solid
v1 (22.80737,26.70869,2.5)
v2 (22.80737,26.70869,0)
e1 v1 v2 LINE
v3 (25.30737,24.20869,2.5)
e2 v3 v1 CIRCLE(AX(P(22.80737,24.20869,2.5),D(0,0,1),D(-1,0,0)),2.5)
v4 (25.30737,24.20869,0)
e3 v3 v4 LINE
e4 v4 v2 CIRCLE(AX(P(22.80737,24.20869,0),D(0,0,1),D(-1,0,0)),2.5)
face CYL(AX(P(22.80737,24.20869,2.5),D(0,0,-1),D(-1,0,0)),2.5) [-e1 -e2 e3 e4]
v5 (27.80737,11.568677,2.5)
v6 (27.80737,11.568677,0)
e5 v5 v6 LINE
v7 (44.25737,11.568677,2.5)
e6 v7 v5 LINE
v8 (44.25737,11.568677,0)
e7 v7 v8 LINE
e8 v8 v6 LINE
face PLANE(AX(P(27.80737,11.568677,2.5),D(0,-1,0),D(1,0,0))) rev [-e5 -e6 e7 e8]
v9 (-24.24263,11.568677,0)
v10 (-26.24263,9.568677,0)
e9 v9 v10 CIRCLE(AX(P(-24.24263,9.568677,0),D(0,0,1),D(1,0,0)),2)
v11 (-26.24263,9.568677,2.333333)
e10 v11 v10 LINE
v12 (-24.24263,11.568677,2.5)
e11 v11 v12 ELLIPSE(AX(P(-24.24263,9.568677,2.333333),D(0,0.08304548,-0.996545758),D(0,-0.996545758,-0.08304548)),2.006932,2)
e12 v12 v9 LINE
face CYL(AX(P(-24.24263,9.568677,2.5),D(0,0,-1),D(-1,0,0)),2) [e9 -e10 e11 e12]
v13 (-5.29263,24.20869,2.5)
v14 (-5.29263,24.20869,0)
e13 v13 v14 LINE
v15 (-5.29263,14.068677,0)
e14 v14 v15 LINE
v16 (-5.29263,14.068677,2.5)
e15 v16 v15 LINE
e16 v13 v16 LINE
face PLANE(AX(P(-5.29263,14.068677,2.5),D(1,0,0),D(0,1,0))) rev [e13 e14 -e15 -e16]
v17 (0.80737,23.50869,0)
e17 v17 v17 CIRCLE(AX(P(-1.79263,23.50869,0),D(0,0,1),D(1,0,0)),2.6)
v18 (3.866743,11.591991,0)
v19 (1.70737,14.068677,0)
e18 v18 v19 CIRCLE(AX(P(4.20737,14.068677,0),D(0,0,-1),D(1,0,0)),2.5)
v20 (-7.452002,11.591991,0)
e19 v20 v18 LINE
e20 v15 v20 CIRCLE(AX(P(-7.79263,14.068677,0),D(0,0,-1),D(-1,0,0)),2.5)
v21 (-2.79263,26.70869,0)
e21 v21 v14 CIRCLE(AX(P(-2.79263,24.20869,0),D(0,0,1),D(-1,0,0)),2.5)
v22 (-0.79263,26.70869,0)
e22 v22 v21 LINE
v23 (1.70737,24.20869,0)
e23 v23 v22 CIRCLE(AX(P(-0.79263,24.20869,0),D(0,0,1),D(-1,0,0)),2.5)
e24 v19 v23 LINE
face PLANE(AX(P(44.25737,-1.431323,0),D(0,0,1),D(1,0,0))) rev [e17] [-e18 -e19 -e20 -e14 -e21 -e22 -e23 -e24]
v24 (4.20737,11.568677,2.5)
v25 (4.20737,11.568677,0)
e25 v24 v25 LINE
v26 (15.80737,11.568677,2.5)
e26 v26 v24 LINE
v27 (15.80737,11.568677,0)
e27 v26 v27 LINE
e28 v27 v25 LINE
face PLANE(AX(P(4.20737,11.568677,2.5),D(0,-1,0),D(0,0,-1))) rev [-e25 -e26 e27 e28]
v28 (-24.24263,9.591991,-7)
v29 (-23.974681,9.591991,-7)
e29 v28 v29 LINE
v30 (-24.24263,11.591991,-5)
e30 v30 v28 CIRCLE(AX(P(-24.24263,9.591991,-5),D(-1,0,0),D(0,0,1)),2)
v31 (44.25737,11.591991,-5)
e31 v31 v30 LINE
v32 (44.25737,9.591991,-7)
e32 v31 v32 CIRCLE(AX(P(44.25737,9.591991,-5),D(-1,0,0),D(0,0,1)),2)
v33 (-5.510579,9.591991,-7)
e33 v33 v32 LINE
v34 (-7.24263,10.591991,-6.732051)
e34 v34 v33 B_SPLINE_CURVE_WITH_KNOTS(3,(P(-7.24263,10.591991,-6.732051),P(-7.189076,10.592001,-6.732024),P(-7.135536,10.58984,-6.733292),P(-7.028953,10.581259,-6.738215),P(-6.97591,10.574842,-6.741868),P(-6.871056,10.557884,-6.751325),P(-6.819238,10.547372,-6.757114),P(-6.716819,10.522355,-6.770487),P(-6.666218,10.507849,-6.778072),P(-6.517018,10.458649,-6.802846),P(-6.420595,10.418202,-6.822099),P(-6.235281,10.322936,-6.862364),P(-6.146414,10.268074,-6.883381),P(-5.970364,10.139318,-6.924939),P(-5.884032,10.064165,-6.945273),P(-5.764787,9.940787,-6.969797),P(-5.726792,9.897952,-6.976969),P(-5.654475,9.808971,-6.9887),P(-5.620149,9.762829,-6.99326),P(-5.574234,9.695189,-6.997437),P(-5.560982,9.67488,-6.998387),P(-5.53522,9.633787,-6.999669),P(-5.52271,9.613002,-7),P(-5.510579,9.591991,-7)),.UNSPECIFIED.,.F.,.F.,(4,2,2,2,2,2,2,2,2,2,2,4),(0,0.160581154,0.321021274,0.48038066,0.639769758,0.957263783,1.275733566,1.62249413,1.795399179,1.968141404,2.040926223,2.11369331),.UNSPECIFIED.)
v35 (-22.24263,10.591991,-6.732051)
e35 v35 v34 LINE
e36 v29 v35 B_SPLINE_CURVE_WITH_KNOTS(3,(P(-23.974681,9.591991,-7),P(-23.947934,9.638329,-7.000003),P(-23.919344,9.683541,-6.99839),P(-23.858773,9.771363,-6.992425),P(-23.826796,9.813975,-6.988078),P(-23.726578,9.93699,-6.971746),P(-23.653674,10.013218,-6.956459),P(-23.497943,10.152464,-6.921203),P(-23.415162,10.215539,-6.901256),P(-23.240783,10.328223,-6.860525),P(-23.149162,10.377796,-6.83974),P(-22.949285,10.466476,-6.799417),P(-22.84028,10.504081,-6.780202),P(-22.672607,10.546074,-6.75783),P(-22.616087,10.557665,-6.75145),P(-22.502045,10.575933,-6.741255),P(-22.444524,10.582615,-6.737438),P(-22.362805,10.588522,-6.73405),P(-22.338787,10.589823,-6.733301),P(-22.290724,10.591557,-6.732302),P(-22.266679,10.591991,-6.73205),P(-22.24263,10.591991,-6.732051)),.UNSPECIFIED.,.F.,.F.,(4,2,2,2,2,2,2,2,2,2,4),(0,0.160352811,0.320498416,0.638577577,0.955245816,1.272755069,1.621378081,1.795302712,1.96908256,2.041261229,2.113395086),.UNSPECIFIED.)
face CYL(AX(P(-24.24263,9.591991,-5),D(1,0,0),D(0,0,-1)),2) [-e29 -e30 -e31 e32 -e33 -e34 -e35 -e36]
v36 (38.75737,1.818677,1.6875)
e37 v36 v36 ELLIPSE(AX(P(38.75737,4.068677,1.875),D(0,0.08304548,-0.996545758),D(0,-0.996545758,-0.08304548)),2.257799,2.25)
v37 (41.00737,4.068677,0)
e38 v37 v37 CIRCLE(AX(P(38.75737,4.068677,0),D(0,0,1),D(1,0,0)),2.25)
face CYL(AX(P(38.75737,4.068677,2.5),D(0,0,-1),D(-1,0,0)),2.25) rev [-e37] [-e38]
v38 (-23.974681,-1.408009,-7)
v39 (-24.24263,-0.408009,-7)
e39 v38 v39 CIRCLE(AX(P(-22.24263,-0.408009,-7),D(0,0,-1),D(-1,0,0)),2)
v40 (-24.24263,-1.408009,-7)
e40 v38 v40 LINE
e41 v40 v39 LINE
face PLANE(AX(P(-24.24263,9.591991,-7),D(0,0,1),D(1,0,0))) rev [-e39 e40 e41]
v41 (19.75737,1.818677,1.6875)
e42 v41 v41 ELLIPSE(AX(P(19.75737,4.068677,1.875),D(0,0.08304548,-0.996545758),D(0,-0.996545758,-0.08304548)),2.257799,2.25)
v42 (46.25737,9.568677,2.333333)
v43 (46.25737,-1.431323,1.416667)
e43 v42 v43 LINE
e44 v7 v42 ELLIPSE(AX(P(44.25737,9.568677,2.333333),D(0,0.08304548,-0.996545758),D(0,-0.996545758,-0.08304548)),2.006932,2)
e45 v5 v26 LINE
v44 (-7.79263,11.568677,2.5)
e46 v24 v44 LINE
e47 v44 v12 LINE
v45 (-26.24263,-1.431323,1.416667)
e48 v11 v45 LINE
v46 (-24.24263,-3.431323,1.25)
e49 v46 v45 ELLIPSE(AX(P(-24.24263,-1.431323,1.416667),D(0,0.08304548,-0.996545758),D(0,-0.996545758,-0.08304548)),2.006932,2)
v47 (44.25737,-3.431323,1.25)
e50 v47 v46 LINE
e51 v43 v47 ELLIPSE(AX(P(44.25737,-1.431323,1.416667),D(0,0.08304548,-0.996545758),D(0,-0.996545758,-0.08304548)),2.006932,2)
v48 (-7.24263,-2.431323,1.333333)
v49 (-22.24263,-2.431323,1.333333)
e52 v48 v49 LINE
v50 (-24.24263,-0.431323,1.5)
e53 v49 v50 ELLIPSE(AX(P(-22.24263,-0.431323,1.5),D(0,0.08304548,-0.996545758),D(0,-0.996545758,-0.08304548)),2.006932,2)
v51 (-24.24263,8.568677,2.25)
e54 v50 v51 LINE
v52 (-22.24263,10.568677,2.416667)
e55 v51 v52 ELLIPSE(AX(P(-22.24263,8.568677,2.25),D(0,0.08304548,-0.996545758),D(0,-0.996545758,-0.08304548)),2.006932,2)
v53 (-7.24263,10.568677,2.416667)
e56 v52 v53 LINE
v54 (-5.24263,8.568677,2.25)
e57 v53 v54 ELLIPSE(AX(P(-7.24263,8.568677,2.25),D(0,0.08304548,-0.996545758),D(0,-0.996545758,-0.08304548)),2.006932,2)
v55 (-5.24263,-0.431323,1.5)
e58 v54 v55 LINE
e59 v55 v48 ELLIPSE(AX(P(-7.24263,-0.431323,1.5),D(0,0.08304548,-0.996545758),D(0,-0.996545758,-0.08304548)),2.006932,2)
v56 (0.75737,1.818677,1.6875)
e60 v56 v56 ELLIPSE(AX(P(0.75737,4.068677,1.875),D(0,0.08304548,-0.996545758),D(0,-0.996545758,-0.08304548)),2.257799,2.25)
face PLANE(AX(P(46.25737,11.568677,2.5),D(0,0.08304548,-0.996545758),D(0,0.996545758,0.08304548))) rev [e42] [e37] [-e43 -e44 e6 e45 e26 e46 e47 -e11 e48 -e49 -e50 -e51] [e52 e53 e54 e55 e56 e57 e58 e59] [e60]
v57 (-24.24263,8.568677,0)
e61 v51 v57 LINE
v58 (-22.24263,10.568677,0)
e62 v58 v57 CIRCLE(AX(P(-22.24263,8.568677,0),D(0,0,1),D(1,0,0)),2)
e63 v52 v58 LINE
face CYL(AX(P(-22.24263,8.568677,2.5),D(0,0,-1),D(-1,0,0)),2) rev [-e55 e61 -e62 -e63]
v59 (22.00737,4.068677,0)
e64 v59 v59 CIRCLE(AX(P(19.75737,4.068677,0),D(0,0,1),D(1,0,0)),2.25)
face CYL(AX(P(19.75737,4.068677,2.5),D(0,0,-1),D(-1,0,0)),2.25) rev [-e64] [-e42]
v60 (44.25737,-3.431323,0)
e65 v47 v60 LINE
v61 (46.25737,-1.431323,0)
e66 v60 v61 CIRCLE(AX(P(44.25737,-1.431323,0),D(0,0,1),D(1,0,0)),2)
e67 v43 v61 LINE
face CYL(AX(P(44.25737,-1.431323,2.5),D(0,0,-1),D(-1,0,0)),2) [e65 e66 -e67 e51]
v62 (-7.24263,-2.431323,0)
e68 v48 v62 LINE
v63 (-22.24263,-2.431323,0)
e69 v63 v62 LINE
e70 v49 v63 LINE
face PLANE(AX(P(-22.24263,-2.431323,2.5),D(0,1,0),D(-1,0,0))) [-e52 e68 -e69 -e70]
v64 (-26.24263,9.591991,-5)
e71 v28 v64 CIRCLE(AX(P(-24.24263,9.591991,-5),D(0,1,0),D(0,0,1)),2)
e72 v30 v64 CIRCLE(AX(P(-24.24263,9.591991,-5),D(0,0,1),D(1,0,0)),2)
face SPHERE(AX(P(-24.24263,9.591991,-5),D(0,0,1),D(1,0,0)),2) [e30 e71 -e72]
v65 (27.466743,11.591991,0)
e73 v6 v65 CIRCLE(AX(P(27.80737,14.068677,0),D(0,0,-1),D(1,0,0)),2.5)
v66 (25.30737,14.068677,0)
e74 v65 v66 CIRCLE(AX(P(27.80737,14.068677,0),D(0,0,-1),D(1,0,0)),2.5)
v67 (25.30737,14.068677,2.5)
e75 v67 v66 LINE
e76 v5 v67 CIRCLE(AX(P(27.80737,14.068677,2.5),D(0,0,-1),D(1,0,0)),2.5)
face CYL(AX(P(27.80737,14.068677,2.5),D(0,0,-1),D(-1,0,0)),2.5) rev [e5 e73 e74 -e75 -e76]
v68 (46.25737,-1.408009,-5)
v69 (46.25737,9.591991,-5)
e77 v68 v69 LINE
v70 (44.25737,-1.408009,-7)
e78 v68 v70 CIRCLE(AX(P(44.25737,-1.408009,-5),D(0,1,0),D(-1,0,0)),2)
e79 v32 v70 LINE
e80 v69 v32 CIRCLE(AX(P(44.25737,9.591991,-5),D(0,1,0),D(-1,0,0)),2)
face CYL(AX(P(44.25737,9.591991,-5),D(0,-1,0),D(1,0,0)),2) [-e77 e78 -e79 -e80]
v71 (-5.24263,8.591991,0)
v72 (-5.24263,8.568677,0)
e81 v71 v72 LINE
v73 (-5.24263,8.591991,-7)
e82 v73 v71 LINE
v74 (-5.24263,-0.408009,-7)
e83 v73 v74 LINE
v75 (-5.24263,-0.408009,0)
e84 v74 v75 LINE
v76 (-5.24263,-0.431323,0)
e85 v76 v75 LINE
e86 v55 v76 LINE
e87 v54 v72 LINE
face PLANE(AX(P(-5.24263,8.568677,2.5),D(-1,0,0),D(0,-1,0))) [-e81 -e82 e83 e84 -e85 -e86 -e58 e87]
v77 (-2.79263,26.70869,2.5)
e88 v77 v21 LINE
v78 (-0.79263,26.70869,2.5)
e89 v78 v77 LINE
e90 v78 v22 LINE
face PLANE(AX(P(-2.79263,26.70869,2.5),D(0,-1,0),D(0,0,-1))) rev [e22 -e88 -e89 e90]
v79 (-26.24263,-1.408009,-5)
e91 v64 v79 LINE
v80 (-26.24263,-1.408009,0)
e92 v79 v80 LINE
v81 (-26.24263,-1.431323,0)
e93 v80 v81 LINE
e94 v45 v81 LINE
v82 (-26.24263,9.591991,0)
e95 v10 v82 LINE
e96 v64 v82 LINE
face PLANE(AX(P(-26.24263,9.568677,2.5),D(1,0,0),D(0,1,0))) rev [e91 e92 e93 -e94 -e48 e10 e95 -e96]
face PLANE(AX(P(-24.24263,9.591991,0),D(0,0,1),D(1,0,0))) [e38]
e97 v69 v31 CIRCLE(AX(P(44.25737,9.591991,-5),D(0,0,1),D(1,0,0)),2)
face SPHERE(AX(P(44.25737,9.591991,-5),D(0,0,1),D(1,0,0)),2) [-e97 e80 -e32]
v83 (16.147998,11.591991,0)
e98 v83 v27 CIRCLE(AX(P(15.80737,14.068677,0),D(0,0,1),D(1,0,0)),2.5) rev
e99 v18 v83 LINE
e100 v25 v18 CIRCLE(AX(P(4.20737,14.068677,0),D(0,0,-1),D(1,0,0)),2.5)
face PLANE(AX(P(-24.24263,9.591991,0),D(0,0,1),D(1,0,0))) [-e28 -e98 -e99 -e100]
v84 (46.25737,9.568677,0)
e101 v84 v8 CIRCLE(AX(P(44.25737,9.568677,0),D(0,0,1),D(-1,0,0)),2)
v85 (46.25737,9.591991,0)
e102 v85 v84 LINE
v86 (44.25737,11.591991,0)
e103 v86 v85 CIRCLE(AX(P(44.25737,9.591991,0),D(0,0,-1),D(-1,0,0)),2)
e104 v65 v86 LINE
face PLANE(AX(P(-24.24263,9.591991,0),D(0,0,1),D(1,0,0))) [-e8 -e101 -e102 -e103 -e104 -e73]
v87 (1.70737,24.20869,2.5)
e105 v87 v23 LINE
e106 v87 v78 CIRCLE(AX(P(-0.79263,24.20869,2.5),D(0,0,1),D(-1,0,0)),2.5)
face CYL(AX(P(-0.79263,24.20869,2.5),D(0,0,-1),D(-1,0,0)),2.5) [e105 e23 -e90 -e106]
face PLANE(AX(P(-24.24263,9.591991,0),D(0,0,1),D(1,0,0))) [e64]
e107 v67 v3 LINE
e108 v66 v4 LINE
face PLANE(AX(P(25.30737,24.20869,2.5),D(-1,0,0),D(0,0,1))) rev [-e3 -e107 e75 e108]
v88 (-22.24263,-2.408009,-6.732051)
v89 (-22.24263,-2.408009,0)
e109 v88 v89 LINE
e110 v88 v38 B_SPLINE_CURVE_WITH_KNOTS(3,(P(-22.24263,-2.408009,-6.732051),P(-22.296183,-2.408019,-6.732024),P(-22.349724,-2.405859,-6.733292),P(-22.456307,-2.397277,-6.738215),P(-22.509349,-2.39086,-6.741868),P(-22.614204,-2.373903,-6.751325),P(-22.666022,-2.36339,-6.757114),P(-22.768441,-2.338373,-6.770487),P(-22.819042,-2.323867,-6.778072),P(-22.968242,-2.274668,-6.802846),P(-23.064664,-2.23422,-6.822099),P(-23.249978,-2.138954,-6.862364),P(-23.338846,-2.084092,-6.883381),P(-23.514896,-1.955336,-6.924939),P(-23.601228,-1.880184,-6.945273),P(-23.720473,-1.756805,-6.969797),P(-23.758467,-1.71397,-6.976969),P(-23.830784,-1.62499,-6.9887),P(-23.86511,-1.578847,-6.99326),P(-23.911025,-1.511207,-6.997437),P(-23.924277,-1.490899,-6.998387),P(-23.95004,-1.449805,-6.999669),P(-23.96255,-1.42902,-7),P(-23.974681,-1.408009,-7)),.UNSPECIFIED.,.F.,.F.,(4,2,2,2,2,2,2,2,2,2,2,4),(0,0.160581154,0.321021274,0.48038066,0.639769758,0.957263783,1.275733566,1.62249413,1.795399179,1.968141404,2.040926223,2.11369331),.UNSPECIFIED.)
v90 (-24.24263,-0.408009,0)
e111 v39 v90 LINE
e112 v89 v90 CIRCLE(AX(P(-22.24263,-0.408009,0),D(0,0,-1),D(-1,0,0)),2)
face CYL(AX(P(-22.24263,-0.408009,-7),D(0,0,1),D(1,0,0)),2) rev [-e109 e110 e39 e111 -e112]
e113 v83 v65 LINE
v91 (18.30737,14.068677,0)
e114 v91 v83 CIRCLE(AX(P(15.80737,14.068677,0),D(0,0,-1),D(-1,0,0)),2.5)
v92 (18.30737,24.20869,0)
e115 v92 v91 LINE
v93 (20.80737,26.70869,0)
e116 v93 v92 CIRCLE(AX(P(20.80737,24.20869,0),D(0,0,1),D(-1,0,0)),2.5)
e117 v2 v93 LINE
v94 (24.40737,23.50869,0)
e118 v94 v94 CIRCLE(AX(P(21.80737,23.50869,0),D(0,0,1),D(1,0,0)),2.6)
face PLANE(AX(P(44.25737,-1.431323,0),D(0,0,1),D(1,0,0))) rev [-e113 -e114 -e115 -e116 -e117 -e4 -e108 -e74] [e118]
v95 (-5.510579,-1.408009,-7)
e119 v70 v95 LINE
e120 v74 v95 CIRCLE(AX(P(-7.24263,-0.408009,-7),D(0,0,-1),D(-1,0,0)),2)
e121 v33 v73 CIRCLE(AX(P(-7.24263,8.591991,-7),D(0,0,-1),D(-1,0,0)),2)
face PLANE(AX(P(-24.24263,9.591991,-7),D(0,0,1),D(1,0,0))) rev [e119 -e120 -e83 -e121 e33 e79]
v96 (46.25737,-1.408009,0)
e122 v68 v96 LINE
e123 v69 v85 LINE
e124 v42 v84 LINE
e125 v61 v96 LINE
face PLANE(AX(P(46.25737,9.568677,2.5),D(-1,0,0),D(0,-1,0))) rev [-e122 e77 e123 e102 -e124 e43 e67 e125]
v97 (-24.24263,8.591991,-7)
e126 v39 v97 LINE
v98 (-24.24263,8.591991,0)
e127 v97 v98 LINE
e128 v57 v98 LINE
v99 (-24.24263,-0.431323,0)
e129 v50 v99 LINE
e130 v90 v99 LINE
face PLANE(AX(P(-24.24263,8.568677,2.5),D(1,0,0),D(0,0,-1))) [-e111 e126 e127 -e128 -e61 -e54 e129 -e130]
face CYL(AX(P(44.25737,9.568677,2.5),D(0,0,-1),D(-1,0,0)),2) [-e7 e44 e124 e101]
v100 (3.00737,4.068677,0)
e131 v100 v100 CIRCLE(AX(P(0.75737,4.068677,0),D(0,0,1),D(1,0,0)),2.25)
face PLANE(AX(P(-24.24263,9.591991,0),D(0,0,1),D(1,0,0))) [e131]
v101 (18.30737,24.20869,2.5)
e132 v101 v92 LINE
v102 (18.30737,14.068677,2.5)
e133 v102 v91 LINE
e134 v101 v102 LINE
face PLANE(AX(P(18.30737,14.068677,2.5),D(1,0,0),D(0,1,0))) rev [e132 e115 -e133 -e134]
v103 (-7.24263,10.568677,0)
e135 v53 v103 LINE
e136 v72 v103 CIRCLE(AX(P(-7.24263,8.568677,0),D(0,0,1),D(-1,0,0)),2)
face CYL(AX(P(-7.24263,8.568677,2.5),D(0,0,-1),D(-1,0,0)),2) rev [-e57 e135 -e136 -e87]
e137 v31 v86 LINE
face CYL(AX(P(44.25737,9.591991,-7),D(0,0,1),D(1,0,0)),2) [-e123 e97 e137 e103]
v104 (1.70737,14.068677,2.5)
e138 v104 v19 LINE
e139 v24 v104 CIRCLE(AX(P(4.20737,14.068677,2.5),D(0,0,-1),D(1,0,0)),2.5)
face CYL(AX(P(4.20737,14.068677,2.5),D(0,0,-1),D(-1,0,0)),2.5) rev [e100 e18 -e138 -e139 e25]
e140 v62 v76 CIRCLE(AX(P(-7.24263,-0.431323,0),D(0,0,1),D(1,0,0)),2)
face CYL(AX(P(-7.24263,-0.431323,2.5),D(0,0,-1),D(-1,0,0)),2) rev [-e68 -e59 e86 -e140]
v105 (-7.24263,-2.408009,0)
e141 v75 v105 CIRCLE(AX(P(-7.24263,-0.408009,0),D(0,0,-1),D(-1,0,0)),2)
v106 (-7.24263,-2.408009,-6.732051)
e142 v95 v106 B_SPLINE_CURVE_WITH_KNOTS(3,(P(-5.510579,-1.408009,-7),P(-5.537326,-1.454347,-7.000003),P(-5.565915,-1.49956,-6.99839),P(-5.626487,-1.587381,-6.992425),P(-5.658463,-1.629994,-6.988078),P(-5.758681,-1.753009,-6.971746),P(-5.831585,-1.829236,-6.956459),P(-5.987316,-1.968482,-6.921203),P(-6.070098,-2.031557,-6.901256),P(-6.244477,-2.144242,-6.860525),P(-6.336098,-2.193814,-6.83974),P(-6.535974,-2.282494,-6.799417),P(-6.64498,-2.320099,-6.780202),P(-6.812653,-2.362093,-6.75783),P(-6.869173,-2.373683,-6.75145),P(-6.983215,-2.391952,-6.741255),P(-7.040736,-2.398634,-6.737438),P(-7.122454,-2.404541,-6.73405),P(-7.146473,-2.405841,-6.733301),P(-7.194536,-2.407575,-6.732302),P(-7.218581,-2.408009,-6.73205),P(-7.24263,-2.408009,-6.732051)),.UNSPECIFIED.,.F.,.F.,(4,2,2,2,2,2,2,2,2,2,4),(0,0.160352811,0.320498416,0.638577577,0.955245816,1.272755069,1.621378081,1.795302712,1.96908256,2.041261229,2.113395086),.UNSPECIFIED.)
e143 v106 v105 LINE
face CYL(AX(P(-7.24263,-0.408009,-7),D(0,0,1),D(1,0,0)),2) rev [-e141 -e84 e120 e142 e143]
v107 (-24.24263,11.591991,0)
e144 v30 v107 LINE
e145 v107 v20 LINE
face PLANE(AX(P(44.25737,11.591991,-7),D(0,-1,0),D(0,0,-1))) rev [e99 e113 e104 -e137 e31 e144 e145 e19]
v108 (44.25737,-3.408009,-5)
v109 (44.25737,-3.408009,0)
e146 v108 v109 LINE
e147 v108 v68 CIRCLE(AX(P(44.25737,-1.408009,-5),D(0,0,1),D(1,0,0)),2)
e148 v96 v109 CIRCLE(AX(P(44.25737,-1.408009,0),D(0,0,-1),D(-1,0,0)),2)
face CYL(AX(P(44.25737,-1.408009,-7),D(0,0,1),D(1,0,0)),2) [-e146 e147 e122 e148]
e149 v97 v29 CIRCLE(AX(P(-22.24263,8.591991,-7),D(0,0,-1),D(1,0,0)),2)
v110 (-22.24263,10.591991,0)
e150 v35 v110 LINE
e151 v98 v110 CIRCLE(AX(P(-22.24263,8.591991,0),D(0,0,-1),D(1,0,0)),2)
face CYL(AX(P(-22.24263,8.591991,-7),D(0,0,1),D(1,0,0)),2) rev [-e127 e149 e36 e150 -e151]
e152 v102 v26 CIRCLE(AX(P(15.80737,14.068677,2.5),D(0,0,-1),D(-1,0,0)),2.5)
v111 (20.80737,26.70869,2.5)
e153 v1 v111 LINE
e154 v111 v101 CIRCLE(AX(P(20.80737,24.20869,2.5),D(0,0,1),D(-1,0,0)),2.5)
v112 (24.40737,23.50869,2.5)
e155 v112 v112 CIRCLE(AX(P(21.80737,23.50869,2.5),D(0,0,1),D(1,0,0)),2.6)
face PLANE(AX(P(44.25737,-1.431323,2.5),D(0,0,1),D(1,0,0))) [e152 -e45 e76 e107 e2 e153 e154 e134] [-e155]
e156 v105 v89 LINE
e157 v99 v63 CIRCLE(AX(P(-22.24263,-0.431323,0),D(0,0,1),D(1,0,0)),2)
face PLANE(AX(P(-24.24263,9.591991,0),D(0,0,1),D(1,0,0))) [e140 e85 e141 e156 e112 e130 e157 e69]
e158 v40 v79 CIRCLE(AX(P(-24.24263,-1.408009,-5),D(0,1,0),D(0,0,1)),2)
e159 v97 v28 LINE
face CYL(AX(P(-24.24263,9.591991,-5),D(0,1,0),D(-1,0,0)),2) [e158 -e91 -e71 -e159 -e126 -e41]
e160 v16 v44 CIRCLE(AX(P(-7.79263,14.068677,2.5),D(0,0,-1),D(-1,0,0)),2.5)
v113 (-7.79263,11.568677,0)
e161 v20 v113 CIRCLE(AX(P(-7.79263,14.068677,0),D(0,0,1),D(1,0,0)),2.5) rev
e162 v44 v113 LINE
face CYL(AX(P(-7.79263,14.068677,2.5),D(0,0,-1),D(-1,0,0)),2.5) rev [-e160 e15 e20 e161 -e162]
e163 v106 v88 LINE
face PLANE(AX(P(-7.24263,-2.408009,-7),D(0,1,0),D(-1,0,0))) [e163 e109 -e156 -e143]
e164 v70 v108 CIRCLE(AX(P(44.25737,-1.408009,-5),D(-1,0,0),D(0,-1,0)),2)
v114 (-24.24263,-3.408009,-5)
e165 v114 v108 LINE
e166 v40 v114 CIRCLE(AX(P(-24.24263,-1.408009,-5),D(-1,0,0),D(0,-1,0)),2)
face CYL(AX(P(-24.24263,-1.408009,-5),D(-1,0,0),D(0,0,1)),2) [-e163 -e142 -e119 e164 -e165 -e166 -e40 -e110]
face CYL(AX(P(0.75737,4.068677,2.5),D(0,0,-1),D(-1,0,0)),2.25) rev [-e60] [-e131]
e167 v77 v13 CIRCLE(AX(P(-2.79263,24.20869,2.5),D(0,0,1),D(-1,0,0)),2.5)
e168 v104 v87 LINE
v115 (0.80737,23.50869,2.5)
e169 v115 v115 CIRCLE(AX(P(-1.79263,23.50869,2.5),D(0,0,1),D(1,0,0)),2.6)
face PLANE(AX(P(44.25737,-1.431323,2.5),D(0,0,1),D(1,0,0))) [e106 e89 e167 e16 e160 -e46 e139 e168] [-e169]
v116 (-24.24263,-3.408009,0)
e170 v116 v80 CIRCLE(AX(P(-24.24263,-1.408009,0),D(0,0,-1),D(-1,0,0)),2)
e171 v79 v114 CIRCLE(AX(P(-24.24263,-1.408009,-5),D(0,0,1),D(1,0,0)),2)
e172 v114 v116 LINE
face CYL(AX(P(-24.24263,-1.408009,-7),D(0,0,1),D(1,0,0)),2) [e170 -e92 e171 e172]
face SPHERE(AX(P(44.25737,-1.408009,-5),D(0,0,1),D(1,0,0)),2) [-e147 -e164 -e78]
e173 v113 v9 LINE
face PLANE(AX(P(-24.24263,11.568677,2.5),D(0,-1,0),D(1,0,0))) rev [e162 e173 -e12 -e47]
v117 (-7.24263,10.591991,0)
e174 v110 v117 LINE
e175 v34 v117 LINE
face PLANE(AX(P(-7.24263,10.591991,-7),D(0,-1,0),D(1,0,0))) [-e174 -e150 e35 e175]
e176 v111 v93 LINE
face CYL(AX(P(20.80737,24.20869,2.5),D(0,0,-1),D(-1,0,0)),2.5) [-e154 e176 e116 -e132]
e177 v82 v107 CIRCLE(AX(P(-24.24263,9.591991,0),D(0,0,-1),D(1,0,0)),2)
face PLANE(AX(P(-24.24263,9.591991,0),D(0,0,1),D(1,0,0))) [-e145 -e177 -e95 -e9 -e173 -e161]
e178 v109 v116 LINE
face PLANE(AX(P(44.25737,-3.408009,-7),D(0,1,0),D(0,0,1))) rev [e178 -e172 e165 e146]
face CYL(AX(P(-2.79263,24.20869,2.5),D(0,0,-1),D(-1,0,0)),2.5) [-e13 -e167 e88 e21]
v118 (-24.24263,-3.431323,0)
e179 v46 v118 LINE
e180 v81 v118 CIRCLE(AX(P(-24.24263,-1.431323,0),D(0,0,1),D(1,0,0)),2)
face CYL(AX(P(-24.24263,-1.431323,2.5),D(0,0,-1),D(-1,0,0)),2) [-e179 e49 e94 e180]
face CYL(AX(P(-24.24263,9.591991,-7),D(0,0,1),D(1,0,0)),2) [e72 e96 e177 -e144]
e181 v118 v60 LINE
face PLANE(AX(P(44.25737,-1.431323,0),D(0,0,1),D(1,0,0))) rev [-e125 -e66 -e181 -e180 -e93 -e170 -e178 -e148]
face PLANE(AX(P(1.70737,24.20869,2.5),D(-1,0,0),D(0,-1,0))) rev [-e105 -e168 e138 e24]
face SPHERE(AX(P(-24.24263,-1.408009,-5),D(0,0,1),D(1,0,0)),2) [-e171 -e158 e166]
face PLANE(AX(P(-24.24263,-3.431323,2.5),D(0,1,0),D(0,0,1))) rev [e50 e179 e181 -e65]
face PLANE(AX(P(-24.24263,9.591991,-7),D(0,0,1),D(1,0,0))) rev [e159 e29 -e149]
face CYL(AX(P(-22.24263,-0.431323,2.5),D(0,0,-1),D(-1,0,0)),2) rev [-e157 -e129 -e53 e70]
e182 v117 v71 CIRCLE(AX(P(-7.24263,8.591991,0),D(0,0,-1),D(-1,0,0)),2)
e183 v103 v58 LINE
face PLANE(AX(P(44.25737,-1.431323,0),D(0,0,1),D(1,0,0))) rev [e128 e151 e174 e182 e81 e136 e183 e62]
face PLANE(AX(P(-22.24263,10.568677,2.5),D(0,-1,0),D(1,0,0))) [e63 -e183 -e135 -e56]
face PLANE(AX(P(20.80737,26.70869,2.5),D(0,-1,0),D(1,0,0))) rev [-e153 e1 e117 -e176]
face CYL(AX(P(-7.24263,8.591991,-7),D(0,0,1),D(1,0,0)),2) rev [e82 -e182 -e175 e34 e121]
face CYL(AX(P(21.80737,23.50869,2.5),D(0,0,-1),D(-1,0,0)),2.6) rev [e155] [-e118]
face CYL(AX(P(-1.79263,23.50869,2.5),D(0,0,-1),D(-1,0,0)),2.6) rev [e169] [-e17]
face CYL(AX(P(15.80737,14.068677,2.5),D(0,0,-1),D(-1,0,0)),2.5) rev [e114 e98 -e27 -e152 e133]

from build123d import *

# Parameters (mm, degrees)
SKETCH1_R           = 2.250000000000002
SKETCH1_R_2         = 2.249999999999999
SKETCH1_R_3         = 2.6000000000000005
SKETCH1_R_4         = 2.600000000000003
BOSS_EXTRUDE1_DEPTH = 2.5
BOSS_EXTRUDE2_DEPTH = 7
CUT_EXTRUDE1_DEPTH  = 78.57966290553851
FILLET1_R           = 2


with BuildPart() as part:
    # Sketch1 → Boss-Extrude1 (new body)
    with BuildSketch(Plane.XY):
        with BuildLine():
            Line((-24.24262981574538, 11.568676716917917), (-7.792629815745428, 11.568676716917919))
            ThreePointArc((-7.792629815745428, 11.568676716917919), (-6.024862862779042, 12.30090976395155), (-5.292629815745411, 14.068676716917937))
            Line((-5.292629815745411, 14.068676716917937), (-5.2926298157454115, 24.208689532378564))
            ThreePointArc((-5.2926298157454115, 24.208689532378564), (-4.5603967687117795, 25.976456485344933), (-2.7926298157454106, 26.70868953237856))
            Line((-2.7926298157454106, 26.70868953237856), (-0.7926298157454105, 26.70868953237856))
            ThreePointArc((-0.7926298157454105, 26.70868953237856), (0.975137137220956, 25.97645648534493), (1.7073701842545899, 24.208689532378564))
            Line((1.7073701842545899, 24.208689532378564), (1.707370184254591, 14.068676716917937))
            ThreePointArc((1.707370184254591, 14.068676716917937), (2.439603231288222, 12.30090976395155), (4.207370184254609, 11.568676716917919))
            Line((4.207370184254609, 11.568676716917919), (15.807370184254571, 11.568676716917919))
            ThreePointArc((15.807370184254571, 11.568676716917919), (17.575137137220956, 12.300909763951552), (18.307370184254587, 14.068676716917935))
            Line((18.307370184254587, 14.068676716917935), (18.30737018425459, 24.208689532378564))
            ThreePointArc((18.30737018425459, 24.208689532378564), (19.039603231288222, 25.976456485344933), (20.80737018425459, 26.708689532378564))
            Line((20.80737018425459, 26.708689532378564), (22.80737018425459, 26.708689532378568))
            ThreePointArc((22.80737018425459, 26.708689532378568), (24.575137137220963, 25.976456485344936), (25.307370184254594, 24.208689532378564))
            Line((25.307370184254594, 24.208689532378564), (25.307370184254594, 14.068676716917937))
            ThreePointArc((25.307370184254594, 14.068676716917937), (26.039603231288226, 12.300909763951552), (27.80737018425461, 11.568676716917919))
            Line((27.80737018425461, 11.568676716917919), (44.25737018425458, 11.568676716917917))
            ThreePointArc((44.25737018425458, 11.568676716917917), (45.67158374662769, 10.982890279291011), (46.2573701842546, 9.568676716917901))
            Line((46.2573701842546, 9.568676716917901), (46.25737018425459, -1.4313232830820677))
            ThreePointArc((46.25737018425459, -1.4313232830820677), (45.67158374662768, -2.845536845455177), (44.257370184254576, -3.431323283082082))
            Line((44.257370184254576, -3.431323283082082), (-24.242629815745374, -3.431323283082082))
            ThreePointArc((-24.242629815745374, -3.431323283082082), (-25.656843378118484, -2.8455368454551784), (-26.242629815745392, -1.4313232830820677))
            Line((-26.242629815745392, -1.4313232830820677), (-26.2426298157454, 9.568676716917903))
            ThreePointArc((-26.2426298157454, 9.568676716917903), (-25.65684337811849, 10.982890279291013), (-24.24262981574538, 11.568676716917917))
        make_face()
        with Locations((38.7573701842546, 4.068676716917918)):
            Circle(SKETCH1_R, mode=Mode.SUBTRACT)
        with Locations((19.757370184254597, 4.068676716917918)):
            Circle(SKETCH1_R_2, mode=Mode.SUBTRACT)
        with Locations((0.7573701842545979, 4.068676716917918)):
            Circle(SKETCH1_R_2, mode=Mode.SUBTRACT)
        with Locations((-1.7926298157454108, 23.50868953237856)):
            Circle(SKETCH1_R_3, mode=Mode.SUBTRACT)
        with Locations((21.80737018425459, 23.508689532378565)):
            Circle(SKETCH1_R_4, mode=Mode.SUBTRACT)
        with BuildLine():
            Line((-22.24262981574538, 10.568676716917917), (-7.242629815745397, 10.56867671691792))
            ThreePointArc((-7.242629815745397, 10.56867671691792), (-5.8284162533723025, 9.982890279291016), (-5.2426298157453965, 8.56867671691792))
            Line((-5.2426298157453965, 8.56867671691792), (-5.242629815745396, -0.43132328308208134))
            ThreePointArc((-5.242629815745396, -0.43132328308208134), (-5.828416253372301, -1.8455368454551766), (-7.242629815745396, -2.4313232830820817))
            Line((-7.242629815745396, -2.4313232830820817), (-22.24262981574538, -2.431323283082082))
            ThreePointArc((-22.24262981574538, -2.431323283082082), (-23.65684337811849, -1.8455368454551762), (-24.242629815745396, -0.43132328308206774))
            Line((-24.242629815745396, -0.43132328308206774), (-24.242629815745396, 8.568676716917903))
            ThreePointArc((-24.242629815745396, 8.568676716917903), (-23.65684337811849, 9.982890279291013), (-22.24262981574538, 10.568676716917917))
        make_face(mode=Mode.SUBTRACT)
    extrude(amount=BOSS_EXTRUDE1_DEPTH)

    # Sketch2 → Boss-Extrude2 (add)
    with BuildSketch(Plane(origin=(0, 0, 0), x_dir=(-1, 0, 0), z_dir=(0, 0, -1))):
        with BuildLine():
            Line((-44.2573701842546, 11.591990827848472), (24.242629815745396, 11.591990827848472))
            ThreePointArc((24.242629815745396, 11.591990827848472), (25.65684337811849, 11.006204390221566), (26.2426298157454, 9.591990827848472))
            Line((26.2426298157454, 9.591990827848472), (26.2426298157454, -1.408009172151513))
            ThreePointArc((26.2426298157454, -1.408009172151513), (25.65684337811849, -2.8222227345246234), (24.24262981574538, -3.4080091721515275))
            Line((24.24262981574538, -3.4080091721515275), (-44.25737018425458, -3.4080091721515275))
            ThreePointArc((-44.25737018425458, -3.4080091721515275), (-45.67158374662769, -2.8222227345246225), (-46.2573701842546, -1.4080091721515136))
            Line((-46.2573701842546, -1.4080091721515136), (-46.2573701842546, 9.591990827848472))
            ThreePointArc((-46.2573701842546, 9.591990827848472), (-45.67158374662769, 11.006204390221567), (-44.2573701842546, 11.591990827848472))
        make_face()
        with BuildLine():
            Line((7.242629815745404, 10.591990827848473), (22.242629815745403, 10.591990827848472))
            ThreePointArc((22.242629815745403, 10.591990827848472), (23.6568433781185, 10.006204390221566), (24.242629815745403, 8.591990827848472))
            Line((24.242629815745403, 8.591990827848472), (24.242629815745403, -0.4080091721515276))
            ThreePointArc((24.242629815745403, -0.4080091721515276), (23.6568433781185, -1.8222227345246227), (22.242629815745403, -2.408009172151528))
            Line((22.242629815745403, -2.408009172151528), (7.2426298157454045, -2.4080091721515275))
            ThreePointArc((7.2426298157454045, -2.4080091721515275), (5.8284162533723105, -1.8222227345246227), (5.242629815745405, -0.40800917215152854))
            Line((5.242629815745405, -0.40800917215152854), (5.242629815745403, 8.591990827848472))
            ThreePointArc((5.242629815745403, 8.591990827848472), (5.828416253372307, 10.006204390221567), (7.242629815745404, 10.591990827848473))
        make_face(mode=Mode.SUBTRACT)
    extrude(amount=BOSS_EXTRUDE2_DEPTH)

    # Sketch3 → Cut-Extrude1 (cut, through all)
    with BuildSketch(Plane.ZY.offset(26.242629815745392)):
        Polygon((2.5, 11.568676716917924), (1.25, -3.4313232830820675), (2.5, -3.431323283082067), align=None)
    extrude(amount=-CUT_EXTRUDE1_DEPTH, mode=Mode.SUBTRACT)

    # Fillet1
    # the kernel refuses this fillet: 2 mm, written as the material it takes off along each edge
    with BuildSketch(Plane(origin=(-24.24262981574539, 9.591990827848464, -7), x_dir=(-3.55e-15, 1, 0), z_dir=(1, 3.55e-15, 0))) as fillet1_piece_1:
        with BuildLine():
            CenterArc((2.000000000000009 - FILLET1_R, FILLET1_R), FILLET1_R, 270, 90)
            Line((2.000000000000009 - FILLET1_R, 0), (2.000000000000009, 0))
            Line((2.000000000000009, 0), (2.000000000000009, FILLET1_R))
        make_face()
    revolve(axis=Axis((-24.24262981574539, 9.591990827848464, -7), (0, 0, 1)), revolution_arc=89.99999999999959, mode=Mode.SUBTRACT)
    with BuildSketch(Plane(origin=(-26.2426298157454, 9.591990827848472, -7), x_dir=(0, 0, 1), z_dir=(0, -1, 0))) as fillet1_piece_2:
        with BuildLine():
            CenterArc((FILLET1_R, -FILLET1_R), FILLET1_R, 90, 89.99999999999989)
            Line((0, -FILLET1_R), (0, 0))
            Line((0, 0), (FILLET1_R, 0))
        make_face()
    extrude(amount=10.999999999999984, mode=Mode.SUBTRACT)
    with BuildSketch(Plane(origin=(-24.242629815745396, -1.4080091721515238, -7), x_dir=(-1, 5.33e-15, 0), z_dir=(5.33e-15, 1, 0))) as fillet1_piece_3:
        with BuildLine():
            CenterArc((2.0000000000000036 - FILLET1_R, FILLET1_R), FILLET1_R, 270.0000000000001, 89.99999999999989)
            Line((2.0000000000000036 - FILLET1_R, 0), (2.0000000000000036, 0))
            Line((2.0000000000000036, 0), (2.0000000000000036, FILLET1_R))
        make_face()
    revolve(axis=Axis((-24.242629815745396, -1.4080091721515238, -7), (0, 0, 1)), revolution_arc=90.00000000000071, mode=Mode.SUBTRACT)
    with BuildSketch(Plane(origin=(-24.24262981574538, -3.4080091721515275, -7), x_dir=(0, 1, 0), z_dir=(1, 0, 0))) as fillet1_piece_4:
        with BuildLine():
            CenterArc((FILLET1_R, FILLET1_R), FILLET1_R, 180, 90)
            Line((0, FILLET1_R), (0, 0))
            Line((0, 0), (FILLET1_R, 0))
        make_face()
    extrude(amount=68.49999999999997, mode=Mode.SUBTRACT)
    with BuildSketch(Plane(origin=(44.25737018425459, -1.408009172151522, -7), x_dir=(-3.55e-15, -1, 0), z_dir=(-1, 3.55e-15, 0))) as fillet1_piece_5:
        with BuildLine():
            CenterArc((2.000000000000006 - FILLET1_R, FILLET1_R), FILLET1_R, 270, 90)
            Line((2.000000000000006, FILLET1_R), (2.000000000000006, 0))
            Line((2.000000000000006, 0), (2.000000000000006 - FILLET1_R, 0))
        make_face()
    revolve(axis=Axis((44.25737018425459, -1.408009172151522, -7), (0, 0, 1)), revolution_arc=90.00000000000044, mode=Mode.SUBTRACT)
    with BuildSketch(Plane(origin=(46.2573701842546, -1.4080091721515136, -7), x_dir=(-3.55e-15, 0, 1), z_dir=(0, 1, 0))) as fillet1_piece_6:
        with BuildLine():
            CenterArc((FILLET1_R, -FILLET1_R), FILLET1_R, 90.0000000000002, 89.9999999999998)
            Line((7.11e-15, -FILLET1_R), (0, 0))
            Line((0, 0), (FILLET1_R, 0))
        make_face()
    extrude(amount=10.999999999999986, mode=Mode.SUBTRACT)
    with BuildSketch(Plane(origin=(44.2573701842546, 9.591990827848468, -7), x_dir=(1, 1.78e-15, 0), z_dir=(1.78e-15, -1, 0))) as fillet1_piece_7:
        with BuildLine():
            CenterArc((2 - FILLET1_R, FILLET1_R), FILLET1_R, 270, 90)
            Line((2, FILLET1_R), (2, 0))
            Line((2, 0), (2 - FILLET1_R, 0))
        make_face()
    revolve(axis=Axis((44.2573701842546, 9.591990827848468, -7), (0, 0, 1)), revolution_arc=89.9999999999999, mode=Mode.SUBTRACT)
    with BuildSketch(Plane(origin=(44.2573701842546, 11.591990827848472, -7), x_dir=(0, 0, 1), z_dir=(-1, 0, 0))) as fillet1_piece_8:
        with BuildLine():
            CenterArc((FILLET1_R, -FILLET1_R), FILLET1_R, 90, 90)
            Line((0, -FILLET1_R), (0, 0))
            Line((0, 0), (FILLET1_R, 0))
        make_face()
    extrude(amount=68.5, mode=Mode.SUBTRACT)


solid = part.part
